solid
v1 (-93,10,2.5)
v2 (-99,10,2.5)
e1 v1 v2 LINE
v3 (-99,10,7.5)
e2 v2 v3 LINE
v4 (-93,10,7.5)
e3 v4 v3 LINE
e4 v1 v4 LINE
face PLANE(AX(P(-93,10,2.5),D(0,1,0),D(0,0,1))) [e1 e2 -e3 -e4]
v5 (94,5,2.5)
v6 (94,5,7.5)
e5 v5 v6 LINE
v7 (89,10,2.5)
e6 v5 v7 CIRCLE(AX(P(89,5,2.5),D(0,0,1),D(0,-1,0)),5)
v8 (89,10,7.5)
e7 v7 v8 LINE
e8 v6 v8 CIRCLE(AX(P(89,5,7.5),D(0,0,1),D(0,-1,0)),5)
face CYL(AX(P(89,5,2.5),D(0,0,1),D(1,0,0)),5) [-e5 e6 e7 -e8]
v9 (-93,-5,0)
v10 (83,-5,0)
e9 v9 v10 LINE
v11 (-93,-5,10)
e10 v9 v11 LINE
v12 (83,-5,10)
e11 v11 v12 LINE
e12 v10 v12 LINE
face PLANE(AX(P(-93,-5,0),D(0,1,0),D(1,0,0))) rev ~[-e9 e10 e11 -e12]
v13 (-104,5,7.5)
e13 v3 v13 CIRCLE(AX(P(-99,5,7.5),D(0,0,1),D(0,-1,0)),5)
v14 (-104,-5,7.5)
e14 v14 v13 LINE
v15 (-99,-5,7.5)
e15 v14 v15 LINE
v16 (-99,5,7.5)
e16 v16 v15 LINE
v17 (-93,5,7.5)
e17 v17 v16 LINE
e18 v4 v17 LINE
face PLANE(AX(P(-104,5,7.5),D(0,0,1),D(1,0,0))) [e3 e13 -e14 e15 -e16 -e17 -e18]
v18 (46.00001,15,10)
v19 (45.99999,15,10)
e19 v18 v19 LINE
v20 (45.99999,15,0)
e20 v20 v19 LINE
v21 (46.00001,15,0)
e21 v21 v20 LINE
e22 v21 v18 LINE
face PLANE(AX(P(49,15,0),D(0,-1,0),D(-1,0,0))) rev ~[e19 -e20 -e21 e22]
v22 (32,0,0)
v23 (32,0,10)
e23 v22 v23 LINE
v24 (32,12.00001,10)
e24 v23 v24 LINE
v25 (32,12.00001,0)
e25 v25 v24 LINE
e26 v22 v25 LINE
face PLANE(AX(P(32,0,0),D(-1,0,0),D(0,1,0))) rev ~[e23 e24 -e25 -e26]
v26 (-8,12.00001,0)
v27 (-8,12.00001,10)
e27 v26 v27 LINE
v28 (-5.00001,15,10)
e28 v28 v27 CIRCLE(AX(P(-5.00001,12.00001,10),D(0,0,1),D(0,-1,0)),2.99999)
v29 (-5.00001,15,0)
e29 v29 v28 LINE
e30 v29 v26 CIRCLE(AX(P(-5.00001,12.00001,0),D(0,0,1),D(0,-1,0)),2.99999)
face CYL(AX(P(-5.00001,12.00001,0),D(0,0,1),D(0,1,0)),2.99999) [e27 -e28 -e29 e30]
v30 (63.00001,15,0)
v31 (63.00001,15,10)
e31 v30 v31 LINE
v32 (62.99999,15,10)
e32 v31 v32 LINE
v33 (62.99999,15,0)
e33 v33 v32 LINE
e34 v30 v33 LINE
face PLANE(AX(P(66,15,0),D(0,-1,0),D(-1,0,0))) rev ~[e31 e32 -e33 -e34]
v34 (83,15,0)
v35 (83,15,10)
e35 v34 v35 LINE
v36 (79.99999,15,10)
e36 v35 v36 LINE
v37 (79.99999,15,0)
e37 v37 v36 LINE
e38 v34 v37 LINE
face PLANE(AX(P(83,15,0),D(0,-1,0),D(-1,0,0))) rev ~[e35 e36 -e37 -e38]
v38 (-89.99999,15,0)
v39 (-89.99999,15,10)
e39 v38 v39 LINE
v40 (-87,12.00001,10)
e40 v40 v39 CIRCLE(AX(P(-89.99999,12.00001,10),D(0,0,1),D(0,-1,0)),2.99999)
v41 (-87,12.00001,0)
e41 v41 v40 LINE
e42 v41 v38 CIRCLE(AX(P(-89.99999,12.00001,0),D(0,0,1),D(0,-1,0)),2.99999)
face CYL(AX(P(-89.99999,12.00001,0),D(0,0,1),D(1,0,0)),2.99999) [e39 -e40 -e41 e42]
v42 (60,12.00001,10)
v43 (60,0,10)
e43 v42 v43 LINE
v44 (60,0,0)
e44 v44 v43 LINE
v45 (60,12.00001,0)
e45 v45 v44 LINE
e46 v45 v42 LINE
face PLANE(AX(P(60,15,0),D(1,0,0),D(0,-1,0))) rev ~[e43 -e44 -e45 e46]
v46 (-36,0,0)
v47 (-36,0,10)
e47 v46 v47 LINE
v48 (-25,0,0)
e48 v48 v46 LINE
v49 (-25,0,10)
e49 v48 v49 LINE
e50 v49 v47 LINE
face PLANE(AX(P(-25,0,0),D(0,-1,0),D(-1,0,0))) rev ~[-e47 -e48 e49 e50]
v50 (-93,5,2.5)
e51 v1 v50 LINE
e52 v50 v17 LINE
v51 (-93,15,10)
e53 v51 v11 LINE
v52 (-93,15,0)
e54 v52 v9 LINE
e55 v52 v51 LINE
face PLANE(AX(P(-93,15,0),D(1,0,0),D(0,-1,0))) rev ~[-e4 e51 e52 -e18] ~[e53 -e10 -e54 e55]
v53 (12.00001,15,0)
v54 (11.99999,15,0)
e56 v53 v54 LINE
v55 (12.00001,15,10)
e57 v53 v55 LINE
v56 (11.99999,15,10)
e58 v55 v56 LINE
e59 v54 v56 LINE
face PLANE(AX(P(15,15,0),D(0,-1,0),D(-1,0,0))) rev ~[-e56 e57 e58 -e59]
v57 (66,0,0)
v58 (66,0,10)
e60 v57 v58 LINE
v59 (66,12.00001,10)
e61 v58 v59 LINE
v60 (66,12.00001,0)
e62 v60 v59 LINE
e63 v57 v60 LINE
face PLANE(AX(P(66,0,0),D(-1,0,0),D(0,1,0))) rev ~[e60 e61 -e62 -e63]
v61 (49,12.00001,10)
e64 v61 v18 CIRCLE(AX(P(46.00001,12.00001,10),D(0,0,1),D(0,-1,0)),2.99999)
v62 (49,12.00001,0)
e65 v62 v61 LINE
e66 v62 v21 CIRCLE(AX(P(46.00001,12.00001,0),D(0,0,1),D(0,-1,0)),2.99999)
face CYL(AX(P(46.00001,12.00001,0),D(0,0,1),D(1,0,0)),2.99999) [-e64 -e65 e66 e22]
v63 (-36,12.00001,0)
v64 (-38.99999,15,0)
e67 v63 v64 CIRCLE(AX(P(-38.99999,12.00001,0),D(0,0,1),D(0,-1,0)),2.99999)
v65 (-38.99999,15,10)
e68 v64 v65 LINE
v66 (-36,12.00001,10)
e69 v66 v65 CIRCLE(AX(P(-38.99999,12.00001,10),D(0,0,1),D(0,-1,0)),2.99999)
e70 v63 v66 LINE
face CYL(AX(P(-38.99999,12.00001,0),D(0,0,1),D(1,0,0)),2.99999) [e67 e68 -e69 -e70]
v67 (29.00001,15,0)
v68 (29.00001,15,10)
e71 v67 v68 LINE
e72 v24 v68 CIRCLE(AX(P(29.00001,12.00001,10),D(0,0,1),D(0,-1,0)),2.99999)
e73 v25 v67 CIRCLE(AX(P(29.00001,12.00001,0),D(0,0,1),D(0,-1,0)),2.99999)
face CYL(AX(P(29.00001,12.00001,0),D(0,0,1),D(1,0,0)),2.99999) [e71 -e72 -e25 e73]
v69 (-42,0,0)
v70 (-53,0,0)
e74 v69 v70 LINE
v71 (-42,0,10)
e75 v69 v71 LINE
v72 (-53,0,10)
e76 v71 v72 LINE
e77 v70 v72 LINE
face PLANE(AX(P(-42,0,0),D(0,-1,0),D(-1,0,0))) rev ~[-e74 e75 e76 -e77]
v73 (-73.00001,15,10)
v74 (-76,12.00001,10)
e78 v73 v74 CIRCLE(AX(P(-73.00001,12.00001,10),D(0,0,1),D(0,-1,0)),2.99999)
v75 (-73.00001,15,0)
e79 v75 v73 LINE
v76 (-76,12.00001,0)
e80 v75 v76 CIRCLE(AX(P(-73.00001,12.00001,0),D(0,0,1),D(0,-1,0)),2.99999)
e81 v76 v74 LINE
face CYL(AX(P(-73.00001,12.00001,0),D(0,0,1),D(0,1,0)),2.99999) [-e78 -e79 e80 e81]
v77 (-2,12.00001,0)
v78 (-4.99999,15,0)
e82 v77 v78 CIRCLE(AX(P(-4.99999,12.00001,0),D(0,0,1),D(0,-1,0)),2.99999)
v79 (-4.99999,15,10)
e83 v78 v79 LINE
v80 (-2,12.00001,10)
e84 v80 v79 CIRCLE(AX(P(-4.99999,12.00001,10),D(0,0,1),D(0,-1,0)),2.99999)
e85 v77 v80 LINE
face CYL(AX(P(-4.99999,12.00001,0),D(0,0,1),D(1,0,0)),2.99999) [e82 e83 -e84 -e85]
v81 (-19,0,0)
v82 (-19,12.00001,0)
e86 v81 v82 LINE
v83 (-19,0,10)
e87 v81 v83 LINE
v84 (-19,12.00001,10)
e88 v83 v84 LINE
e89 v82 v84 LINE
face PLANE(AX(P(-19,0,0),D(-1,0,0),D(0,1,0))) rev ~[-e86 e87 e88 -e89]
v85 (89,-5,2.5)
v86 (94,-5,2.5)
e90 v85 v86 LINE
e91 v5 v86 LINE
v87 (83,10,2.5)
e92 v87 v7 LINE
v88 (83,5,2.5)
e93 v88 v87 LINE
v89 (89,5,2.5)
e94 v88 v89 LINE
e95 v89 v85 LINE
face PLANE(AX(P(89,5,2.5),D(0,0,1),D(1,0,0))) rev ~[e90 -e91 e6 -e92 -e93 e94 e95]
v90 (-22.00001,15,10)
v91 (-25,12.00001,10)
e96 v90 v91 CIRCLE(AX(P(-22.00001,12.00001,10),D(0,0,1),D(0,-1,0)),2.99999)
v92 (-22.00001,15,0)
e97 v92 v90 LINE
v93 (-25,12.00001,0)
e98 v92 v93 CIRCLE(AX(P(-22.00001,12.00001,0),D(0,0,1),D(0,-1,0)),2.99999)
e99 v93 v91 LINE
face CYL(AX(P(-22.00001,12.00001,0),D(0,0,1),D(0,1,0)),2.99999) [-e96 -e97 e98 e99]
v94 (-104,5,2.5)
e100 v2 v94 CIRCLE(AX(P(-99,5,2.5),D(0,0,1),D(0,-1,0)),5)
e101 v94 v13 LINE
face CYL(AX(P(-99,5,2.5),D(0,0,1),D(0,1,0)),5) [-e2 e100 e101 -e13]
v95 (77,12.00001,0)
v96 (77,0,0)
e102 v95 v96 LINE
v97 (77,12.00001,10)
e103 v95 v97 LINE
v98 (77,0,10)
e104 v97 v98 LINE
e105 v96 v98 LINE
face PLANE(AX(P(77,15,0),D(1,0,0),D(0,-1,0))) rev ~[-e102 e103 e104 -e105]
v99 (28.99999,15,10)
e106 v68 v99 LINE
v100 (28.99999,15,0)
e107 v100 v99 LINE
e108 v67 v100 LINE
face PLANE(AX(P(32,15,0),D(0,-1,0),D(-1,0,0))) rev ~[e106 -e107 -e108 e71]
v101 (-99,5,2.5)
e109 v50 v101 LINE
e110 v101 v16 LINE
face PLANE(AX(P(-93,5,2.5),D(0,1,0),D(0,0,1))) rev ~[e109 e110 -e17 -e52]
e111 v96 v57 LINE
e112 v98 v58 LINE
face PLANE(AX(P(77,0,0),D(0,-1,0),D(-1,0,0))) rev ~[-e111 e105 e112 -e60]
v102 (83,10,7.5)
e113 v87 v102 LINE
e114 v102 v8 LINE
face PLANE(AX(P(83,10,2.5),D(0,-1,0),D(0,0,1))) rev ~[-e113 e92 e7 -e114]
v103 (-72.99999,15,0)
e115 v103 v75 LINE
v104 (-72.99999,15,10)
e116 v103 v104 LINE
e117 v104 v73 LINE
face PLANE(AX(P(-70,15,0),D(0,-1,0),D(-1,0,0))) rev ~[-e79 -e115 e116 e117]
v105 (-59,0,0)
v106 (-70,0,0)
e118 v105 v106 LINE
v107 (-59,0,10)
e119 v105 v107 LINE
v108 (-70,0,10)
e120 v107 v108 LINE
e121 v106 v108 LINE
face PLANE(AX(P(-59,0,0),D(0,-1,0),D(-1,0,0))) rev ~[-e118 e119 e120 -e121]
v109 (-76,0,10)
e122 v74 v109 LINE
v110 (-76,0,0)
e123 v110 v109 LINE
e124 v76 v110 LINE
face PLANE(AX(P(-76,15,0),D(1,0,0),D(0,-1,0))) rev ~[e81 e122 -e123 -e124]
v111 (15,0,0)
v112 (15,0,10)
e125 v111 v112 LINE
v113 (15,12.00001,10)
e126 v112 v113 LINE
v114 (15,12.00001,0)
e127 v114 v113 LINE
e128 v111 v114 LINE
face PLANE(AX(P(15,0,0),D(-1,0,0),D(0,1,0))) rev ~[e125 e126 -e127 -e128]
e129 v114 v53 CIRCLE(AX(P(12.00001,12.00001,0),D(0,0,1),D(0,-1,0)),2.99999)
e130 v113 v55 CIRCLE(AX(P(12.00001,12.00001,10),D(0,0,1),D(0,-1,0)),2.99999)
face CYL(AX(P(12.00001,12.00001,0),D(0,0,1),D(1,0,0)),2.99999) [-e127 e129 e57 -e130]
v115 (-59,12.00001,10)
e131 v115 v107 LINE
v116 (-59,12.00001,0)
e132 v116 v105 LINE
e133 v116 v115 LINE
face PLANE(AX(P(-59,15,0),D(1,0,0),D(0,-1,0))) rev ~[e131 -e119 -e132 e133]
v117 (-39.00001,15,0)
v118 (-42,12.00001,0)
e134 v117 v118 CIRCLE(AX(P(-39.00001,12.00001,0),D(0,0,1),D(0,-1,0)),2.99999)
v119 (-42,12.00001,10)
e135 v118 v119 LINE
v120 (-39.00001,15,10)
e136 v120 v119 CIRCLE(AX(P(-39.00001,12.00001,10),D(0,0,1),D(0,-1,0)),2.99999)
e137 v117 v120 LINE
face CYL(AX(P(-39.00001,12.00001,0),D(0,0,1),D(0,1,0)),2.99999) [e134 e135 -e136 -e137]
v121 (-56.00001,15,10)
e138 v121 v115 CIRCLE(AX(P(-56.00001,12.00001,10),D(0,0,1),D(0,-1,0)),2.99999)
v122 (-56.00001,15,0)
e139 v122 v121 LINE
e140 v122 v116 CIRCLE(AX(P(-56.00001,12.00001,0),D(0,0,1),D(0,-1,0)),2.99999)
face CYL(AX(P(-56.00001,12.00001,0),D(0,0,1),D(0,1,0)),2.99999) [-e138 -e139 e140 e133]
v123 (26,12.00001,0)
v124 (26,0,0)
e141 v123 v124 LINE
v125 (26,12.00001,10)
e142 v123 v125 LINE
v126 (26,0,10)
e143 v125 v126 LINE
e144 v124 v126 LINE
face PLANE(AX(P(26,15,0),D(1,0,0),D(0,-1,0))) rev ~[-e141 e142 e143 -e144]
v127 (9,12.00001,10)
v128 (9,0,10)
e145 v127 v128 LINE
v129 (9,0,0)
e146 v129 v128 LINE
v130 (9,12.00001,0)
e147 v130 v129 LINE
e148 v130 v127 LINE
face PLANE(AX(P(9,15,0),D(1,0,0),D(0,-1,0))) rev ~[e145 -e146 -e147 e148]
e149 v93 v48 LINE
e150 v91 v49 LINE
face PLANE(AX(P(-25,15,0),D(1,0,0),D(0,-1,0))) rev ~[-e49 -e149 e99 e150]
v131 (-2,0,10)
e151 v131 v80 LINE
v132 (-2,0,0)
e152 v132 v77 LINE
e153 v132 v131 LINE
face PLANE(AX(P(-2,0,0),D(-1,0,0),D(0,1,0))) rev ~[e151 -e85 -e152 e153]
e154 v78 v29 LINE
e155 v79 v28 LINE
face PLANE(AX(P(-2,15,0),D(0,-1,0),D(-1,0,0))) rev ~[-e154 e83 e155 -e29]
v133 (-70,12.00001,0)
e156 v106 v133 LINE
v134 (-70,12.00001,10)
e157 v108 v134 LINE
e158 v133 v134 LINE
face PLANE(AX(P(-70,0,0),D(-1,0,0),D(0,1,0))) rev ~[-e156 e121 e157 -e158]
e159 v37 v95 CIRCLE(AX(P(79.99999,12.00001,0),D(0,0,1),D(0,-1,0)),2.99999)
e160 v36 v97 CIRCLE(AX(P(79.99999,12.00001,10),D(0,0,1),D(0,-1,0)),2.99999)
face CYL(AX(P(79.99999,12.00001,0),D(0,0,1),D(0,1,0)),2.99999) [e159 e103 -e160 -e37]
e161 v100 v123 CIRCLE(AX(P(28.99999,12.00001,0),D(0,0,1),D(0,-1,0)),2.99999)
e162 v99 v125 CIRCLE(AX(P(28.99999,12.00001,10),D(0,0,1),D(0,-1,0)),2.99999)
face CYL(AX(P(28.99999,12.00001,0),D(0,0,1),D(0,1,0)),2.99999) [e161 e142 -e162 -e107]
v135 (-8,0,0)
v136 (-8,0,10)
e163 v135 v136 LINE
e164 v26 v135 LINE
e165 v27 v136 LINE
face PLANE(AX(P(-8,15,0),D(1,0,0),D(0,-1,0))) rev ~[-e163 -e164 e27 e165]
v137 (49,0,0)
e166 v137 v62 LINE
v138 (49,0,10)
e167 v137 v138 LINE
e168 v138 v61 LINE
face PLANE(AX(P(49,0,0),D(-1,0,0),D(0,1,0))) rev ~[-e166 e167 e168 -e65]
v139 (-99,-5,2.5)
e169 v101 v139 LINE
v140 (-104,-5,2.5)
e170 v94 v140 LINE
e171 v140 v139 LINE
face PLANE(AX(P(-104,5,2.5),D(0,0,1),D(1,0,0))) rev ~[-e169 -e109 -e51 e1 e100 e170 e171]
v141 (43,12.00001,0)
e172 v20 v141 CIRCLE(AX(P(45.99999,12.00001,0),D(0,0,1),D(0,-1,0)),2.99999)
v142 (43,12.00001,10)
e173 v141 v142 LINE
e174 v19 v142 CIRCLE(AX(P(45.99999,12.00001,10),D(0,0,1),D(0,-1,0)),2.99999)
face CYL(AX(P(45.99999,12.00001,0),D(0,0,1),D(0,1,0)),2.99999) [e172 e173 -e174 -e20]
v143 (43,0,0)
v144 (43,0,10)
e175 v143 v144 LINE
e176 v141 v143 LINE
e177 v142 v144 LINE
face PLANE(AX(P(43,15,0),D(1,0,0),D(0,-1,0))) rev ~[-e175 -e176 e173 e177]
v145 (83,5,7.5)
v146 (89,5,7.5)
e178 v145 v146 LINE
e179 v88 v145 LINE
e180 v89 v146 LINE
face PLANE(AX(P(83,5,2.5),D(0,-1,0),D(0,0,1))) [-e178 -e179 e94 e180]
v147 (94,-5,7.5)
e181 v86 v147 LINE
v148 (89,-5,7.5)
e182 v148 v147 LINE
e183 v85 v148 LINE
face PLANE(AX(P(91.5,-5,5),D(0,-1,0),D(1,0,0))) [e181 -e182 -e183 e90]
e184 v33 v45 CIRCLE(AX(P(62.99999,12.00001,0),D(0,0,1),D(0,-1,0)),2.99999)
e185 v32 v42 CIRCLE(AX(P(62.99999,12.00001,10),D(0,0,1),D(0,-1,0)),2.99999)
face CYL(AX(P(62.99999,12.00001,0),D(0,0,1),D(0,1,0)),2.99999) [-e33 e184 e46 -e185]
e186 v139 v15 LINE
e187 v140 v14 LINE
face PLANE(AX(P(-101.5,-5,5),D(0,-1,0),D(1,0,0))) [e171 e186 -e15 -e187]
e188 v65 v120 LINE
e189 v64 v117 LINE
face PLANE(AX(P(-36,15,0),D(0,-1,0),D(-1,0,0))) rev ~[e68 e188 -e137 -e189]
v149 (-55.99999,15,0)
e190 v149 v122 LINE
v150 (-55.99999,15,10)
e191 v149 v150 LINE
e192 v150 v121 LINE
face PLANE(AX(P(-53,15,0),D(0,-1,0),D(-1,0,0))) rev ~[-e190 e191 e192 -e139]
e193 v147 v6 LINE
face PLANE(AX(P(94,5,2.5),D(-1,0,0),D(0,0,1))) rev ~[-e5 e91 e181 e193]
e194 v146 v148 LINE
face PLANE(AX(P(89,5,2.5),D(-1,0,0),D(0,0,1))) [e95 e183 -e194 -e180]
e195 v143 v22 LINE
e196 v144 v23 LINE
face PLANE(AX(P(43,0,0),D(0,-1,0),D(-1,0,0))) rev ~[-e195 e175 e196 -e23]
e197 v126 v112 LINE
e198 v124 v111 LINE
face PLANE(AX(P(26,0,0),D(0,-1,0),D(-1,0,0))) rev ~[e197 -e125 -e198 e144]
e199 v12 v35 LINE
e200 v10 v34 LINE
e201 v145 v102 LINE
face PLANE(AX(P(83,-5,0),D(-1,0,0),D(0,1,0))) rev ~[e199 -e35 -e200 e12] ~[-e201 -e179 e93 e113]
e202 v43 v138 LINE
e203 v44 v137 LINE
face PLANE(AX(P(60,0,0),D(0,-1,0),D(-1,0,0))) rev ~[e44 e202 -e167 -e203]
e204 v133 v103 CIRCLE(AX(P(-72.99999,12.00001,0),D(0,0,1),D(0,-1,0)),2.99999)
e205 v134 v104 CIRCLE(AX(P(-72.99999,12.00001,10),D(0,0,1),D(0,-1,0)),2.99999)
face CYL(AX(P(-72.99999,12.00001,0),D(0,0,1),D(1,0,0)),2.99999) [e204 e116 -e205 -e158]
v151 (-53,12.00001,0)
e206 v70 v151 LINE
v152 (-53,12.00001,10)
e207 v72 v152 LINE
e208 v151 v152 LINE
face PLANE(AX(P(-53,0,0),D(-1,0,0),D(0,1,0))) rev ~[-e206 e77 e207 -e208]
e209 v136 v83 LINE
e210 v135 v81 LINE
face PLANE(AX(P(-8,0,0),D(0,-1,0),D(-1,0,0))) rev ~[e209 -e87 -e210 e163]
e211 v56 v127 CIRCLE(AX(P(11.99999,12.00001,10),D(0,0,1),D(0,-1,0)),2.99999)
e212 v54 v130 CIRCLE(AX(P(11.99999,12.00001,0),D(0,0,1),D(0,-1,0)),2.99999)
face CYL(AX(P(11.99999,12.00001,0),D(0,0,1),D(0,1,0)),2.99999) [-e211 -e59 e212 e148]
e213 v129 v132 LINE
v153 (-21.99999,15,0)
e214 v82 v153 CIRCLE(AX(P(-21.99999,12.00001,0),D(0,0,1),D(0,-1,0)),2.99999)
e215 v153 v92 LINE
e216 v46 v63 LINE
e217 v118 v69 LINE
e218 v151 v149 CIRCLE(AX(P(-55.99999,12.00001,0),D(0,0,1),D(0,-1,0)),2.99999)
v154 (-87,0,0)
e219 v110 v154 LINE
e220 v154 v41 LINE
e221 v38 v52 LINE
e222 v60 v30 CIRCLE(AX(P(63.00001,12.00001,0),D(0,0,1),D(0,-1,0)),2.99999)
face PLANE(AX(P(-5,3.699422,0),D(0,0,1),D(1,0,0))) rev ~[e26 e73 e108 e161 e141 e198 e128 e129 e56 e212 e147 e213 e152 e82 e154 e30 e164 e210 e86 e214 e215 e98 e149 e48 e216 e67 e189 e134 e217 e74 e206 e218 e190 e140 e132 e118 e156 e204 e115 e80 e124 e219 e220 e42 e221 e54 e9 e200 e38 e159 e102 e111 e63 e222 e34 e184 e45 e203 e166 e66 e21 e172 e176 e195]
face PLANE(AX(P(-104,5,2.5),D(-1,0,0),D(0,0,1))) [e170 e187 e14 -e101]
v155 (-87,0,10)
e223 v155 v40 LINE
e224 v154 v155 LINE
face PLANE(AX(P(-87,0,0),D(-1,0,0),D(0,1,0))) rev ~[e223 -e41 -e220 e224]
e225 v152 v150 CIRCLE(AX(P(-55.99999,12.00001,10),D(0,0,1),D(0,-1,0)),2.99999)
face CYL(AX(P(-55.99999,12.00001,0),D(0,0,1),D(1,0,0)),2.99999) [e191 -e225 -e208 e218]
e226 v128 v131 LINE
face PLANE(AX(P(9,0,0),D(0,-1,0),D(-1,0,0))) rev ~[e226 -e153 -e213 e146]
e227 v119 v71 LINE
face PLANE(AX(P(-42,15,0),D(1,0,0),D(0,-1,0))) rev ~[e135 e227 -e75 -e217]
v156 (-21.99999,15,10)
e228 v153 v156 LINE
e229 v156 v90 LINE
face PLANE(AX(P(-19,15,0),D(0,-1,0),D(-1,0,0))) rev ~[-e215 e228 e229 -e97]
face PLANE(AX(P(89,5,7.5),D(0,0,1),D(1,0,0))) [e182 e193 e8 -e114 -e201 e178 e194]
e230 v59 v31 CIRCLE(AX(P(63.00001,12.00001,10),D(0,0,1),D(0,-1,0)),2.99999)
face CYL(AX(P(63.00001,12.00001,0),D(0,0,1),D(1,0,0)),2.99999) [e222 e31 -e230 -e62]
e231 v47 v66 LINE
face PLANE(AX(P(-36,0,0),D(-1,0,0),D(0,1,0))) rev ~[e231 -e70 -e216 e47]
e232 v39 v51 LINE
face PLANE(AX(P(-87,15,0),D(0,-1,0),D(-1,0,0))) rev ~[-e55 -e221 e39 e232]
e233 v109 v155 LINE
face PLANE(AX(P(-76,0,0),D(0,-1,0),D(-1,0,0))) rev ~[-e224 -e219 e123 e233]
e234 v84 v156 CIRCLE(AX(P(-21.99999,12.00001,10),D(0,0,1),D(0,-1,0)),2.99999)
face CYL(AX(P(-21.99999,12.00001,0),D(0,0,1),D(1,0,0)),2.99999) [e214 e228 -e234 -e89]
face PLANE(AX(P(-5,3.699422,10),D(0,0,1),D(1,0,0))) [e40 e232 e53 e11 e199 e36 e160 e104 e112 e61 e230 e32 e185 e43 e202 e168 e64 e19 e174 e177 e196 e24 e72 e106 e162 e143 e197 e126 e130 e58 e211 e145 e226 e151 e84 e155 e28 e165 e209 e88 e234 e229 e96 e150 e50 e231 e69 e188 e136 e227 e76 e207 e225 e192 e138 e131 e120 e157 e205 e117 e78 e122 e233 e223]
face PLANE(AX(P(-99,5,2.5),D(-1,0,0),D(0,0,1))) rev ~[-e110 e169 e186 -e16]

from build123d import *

# Parameters (mm, degrees)
F1_DEPTH  = 10
F2_W      = 5
F2_H      = 5
F3_DEPTH  = 11
F4_W      = 5
F4_H      = 5
F5_DEPTH  = 10
F6_R      = 2.99999
F7_R      = 5
F8_W      = 5
F8_H      = 5
F9_DEPTH  = 11
F10_W     = 5
F10_H     = 5
F11_DEPTH = 10
F12_R     = 5


# Not quite as in the source:
# - a fillet or chamfer is up to 0.001 mm smaller than in the source, because OpenCascade refuses the exact size


with BuildPart() as f1:
    # F0 (on Top) → F1 (new body)
    with BuildSketch(Plane.XY):
        Polygon((83, -5), (83, 15), (77, 15), (77, 0), (66, 0), (66, 15), (60, 15), (60, 0), (49, 0), (49, 15), (43, 15), (43, 0), (32, 0), (32, 15), (26, 15), (26, 0), (15, 0), (15, 15), (9, 15), (9, 0), (-2, 0), (-2, 15), (-8, 15), (-8, 0), (-19, 0), (-19, 15), (-25, 15), (-25, 0), (-36, 0), (-36, 15), (-42, 15), (-42, 0), (-53, 0), (-53, 15), (-59, 15), (-59, 0), (-70, 0), (-70, 15), (-76, 15), (-76, 0), (-87, 0), (-87, 15), (-93, 15), (-93, -5), align=None)
    extrude(amount=F1_DEPTH)

    # F2 (on face) → F3 (join)
    with BuildSketch(Plane(origin=(-93, 0, 0), x_dir=(0, -1, 0), z_dir=(-1, 0, 0))):
        with Locations((-7.5, 5)):
            Rectangle(F2_W, F2_H)
    extrude(amount=F3_DEPTH)

    # F4 (on face) → F5 (join)
    with BuildSketch(Plane.XZ.offset(-5)):
        with Locations((-101.5, 5)):
            Rectangle(F4_W, F4_H)
    extrude(amount=F5_DEPTH)

    # F6 (radius 3 in the source; OpenCascade refuses exactly that, so slightly less here)
    f6_edges = [f1.edges().sort_by_distance(p)[0] for p in [
        (-87, 15, 5),
        (-76, 15, 5),
        (-70, 15, 5),
        (-59, 15, 5),
        (-53, 15, 5),
        (-42, 15, 5),
        (-36, 15, 5),
        (-25, 15, 5),
        (-19, 15, 5),
        (-8, 15, 5),
        (-2, 15, 5),
        (9, 15, 5),
        (15, 15, 5),
        (26, 15, 5),
        (32, 15, 5),
        (43, 15, 5),
        (49, 15, 5),
        (60, 15, 5),
        (66, 15, 5),
        (77, 15, 5),
    ]]
    fillet(f6_edges, radius=F6_R)

    # F7
    f7_edges = [f1.edges().sort_by_distance(p)[0] for p in [
        (-104, 10, 5),
    ]]
    fillet(f7_edges, radius=F7_R)

    # F8 (on face) → F9 (join)
    with BuildSketch(Plane.YZ.offset(83)):
        with Locations((7.5, 5)):
            Rectangle(F8_W, F8_H)
    extrude(amount=F9_DEPTH)

    # F10 (on face) → F11 (join)
    with BuildSketch(Plane.XZ.offset(-5)):
        with Locations((91.5, 5)):
            Rectangle(F10_W, F10_H)
    extrude(amount=F11_DEPTH)

    # F12
    f12_edges = [f1.edges().sort_by_distance(p)[0] for p in [
        (94, 10, 5),
    ]]
    fillet(f12_edges, radius=F12_R)


solid = f1.part
